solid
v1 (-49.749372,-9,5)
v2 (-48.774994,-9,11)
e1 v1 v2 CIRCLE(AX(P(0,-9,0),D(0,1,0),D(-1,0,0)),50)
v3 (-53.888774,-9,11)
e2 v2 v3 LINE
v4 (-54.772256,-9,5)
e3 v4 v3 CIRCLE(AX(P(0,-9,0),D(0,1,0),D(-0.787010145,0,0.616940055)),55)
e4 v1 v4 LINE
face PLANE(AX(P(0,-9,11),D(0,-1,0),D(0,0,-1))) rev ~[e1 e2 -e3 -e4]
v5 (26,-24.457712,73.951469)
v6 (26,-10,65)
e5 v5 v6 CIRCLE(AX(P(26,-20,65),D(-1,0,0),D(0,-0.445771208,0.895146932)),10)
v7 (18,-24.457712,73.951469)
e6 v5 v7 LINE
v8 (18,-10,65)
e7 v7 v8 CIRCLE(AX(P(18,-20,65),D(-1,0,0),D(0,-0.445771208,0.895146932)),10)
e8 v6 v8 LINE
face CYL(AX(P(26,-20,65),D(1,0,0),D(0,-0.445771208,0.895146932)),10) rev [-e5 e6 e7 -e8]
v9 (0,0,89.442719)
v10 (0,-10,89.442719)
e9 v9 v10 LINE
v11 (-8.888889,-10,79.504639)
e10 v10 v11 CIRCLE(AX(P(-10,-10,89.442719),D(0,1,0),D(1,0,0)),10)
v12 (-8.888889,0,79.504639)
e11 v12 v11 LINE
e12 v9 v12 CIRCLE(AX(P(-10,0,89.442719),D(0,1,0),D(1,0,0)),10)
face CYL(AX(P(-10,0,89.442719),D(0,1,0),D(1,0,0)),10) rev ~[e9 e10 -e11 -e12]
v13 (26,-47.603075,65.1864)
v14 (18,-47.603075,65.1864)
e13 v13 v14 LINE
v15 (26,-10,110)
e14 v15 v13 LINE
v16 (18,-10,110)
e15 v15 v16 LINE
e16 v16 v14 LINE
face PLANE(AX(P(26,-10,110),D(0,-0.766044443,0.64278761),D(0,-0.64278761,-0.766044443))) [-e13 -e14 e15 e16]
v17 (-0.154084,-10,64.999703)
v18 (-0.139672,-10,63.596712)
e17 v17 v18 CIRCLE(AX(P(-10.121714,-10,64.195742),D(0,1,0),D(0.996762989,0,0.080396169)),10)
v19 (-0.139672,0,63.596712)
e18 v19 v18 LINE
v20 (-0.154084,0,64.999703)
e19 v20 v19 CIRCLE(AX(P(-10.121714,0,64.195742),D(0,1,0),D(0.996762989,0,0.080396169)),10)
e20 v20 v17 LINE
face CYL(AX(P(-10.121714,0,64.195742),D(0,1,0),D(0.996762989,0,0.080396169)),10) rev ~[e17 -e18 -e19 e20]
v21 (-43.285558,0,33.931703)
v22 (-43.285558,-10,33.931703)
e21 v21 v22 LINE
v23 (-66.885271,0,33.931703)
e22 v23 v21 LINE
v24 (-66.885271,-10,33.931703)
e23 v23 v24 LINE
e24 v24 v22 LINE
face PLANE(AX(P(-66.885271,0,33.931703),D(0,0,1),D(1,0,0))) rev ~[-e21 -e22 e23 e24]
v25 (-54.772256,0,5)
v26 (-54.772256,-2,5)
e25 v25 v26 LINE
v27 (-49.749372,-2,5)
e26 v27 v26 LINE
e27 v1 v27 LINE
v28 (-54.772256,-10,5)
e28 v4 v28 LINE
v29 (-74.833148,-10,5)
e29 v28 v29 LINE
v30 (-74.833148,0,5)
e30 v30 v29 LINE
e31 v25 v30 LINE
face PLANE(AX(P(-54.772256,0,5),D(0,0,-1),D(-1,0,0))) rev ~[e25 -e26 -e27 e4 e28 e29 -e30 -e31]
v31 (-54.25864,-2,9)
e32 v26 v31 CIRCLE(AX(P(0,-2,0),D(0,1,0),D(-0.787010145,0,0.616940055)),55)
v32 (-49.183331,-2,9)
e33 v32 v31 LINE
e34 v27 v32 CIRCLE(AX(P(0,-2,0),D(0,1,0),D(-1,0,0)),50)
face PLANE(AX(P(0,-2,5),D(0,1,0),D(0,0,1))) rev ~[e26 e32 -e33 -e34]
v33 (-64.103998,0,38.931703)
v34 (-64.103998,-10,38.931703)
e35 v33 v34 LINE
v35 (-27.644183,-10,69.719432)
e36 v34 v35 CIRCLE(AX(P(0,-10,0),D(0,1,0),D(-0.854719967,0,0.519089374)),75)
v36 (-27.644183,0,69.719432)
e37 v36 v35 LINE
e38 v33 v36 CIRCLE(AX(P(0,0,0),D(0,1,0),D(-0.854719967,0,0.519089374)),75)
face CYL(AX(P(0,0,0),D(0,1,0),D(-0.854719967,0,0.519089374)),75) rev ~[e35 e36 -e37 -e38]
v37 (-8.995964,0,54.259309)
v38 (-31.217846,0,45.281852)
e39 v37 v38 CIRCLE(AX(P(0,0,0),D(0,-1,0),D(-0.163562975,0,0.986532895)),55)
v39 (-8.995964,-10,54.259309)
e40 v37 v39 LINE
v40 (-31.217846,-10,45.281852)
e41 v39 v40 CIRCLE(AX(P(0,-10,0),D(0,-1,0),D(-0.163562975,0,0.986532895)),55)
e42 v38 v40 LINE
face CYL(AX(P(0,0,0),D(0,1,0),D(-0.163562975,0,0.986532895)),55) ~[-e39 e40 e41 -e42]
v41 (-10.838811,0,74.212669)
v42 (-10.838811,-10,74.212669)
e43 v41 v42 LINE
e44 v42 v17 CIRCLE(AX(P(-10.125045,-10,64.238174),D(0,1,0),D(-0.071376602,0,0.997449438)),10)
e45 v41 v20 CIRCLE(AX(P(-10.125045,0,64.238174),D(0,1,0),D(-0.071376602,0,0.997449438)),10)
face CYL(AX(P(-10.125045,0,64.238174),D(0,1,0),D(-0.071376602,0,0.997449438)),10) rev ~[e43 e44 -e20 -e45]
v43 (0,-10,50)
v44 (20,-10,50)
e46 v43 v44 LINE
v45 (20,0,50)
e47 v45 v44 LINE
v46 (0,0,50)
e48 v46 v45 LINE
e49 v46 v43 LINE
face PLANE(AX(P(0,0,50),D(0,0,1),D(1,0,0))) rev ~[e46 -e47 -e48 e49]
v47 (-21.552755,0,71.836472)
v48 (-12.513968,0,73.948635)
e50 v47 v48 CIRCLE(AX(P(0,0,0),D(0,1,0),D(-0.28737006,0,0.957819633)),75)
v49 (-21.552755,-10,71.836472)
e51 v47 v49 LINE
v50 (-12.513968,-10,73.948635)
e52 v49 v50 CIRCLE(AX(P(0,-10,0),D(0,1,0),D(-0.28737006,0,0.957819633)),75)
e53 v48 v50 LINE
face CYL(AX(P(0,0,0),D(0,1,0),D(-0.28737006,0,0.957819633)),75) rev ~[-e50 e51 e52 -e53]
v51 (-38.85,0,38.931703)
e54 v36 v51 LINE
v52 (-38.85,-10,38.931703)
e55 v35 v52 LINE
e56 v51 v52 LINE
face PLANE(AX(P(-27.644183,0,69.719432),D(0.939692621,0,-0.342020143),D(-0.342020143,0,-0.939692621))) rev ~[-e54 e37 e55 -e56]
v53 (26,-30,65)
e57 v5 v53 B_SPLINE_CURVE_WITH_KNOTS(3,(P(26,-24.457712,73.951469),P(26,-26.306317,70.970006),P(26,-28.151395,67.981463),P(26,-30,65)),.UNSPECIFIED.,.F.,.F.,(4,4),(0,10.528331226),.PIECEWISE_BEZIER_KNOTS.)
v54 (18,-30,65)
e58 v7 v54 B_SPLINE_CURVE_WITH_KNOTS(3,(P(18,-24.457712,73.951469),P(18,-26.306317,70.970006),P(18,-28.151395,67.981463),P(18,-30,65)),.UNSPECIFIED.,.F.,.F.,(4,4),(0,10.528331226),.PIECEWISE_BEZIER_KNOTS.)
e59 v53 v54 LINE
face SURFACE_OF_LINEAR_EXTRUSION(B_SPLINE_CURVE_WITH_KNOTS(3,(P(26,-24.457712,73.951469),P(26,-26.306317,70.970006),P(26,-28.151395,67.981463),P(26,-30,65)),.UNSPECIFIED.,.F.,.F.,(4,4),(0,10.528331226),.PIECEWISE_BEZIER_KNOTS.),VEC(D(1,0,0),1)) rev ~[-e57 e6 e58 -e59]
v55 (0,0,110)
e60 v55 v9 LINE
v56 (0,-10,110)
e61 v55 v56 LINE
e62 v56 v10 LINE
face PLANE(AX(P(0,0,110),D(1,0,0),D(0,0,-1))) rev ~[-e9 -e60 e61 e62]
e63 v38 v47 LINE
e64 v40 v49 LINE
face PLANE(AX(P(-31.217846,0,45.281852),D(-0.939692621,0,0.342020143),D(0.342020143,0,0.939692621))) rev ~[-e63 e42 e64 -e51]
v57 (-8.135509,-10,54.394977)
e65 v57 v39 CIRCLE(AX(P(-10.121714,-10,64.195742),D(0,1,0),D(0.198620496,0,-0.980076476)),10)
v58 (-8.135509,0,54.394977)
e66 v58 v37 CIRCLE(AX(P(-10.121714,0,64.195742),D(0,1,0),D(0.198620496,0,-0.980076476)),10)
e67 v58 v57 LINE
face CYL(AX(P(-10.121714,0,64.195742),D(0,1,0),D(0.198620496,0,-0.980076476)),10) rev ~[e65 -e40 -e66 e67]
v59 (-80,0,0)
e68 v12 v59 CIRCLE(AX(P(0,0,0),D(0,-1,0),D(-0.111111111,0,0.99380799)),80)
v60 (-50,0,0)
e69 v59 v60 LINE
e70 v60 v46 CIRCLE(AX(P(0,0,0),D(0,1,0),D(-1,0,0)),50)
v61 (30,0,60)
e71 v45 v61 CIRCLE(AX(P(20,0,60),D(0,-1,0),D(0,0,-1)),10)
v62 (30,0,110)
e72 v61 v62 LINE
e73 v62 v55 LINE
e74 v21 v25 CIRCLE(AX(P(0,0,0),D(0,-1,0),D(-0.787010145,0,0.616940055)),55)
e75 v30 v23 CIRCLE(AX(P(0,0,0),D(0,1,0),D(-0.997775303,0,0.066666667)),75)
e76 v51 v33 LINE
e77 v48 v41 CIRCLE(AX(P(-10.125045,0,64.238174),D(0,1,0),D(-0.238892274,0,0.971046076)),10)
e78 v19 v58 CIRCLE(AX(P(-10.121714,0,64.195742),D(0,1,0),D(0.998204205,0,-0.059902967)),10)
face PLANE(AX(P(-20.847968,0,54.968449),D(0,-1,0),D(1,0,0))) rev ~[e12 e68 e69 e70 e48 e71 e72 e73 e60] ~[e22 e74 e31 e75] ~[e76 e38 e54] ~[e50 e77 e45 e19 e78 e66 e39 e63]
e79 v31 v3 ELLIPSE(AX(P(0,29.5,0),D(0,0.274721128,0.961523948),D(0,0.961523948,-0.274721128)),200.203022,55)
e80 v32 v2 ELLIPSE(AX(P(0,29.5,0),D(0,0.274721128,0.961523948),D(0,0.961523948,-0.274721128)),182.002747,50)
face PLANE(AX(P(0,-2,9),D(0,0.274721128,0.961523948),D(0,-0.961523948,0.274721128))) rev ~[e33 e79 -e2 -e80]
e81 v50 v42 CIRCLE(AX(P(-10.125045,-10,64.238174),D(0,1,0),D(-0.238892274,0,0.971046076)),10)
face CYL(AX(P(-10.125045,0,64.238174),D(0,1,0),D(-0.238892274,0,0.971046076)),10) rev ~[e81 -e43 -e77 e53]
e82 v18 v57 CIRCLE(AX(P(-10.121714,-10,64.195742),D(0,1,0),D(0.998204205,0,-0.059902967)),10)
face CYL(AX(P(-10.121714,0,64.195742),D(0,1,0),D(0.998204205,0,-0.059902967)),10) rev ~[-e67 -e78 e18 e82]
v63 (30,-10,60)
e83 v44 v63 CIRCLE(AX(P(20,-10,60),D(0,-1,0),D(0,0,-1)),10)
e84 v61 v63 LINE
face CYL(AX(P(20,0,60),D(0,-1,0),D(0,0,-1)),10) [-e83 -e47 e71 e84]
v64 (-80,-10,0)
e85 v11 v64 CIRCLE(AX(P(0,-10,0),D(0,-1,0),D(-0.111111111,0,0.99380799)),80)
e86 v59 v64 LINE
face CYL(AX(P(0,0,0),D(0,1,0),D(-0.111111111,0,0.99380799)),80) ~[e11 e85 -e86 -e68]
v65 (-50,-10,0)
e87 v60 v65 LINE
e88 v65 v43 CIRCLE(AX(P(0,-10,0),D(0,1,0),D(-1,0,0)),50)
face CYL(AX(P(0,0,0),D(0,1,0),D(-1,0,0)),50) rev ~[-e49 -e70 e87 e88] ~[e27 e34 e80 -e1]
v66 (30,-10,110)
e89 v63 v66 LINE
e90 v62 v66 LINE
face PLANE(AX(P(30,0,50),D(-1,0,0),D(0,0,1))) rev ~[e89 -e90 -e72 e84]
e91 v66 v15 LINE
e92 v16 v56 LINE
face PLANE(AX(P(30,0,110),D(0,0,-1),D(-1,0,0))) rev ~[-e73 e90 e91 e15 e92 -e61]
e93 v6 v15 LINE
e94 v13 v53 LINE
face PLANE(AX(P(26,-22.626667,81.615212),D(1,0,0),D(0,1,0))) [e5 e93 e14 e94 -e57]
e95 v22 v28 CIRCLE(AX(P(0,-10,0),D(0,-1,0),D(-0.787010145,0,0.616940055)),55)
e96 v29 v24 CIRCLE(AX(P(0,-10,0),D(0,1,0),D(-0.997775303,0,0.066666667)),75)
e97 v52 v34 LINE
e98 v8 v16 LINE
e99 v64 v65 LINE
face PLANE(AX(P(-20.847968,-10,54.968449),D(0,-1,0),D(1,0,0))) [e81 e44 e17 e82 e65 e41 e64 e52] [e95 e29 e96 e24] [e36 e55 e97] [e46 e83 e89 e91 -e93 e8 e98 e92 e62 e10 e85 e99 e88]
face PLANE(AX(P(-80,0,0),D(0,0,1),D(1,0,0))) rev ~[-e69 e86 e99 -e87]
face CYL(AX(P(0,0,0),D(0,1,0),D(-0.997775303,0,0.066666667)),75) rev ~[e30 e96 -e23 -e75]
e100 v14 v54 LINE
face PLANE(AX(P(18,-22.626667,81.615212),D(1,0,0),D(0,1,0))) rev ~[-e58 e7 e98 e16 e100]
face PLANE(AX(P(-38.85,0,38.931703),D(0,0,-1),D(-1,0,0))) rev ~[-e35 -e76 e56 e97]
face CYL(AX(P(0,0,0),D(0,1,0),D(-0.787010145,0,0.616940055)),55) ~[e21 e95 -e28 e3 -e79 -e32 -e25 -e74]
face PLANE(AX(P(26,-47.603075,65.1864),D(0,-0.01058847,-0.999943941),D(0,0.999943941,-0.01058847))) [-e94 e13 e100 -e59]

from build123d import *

# Parameters (mm, degrees)
F1_DEPTH = 10
F2_R     = 10
F4_DEPTH = 55
F6_START = -4
F6_DEPTH = 8


# Not quite as in the source:
# - a feature names something its author has since deleted; it is built from what else it names


with BuildPart() as f1:
    # F0 (on Front) → F1 (new body)
    with BuildSketch(Plane.XZ):
        with BuildLine():
            ThreePointArc((-50, 0), (-35.3553390593, 35.3553390593), (0, 50))
            Line((0, 50), (30, 50))
            Line((30, 50), (30, 110))
            Line((30, 110), (0, 110))
            Line((0, 110), (0, 89.4427191))
            ThreePointArc((0, 89.4427191), (-2.546440075, 82.7760524333), (-8.8888888889, 79.5046392))
            ThreePointArc((-8.8888888889, 79.5046392), (-59.6284794, 53.3333333333), (-80, 0))
            Line((-80, 0), (-50, 0))
        make_face()
        with BuildLine():
            Line((-0.1396715456, 63.5967118692), (-0.0513620047, 54.9999760177))
            ThreePointArc((-0.0513620047, 54.9999760177), (-4.1045972669, 54.8466250673), (-8.135508632, 54.3949767837))
            ThreePointArc((-8.135508632, 54.3949767837), (-8.5642581923, 54.317769449), (-8.9959636029, 54.2593092368))
            ThreePointArc((-8.9959636029, 54.2593092368), (-20.6018520556, 50.99572229), (-31.2178460585, 45.2818516347))
            ThreePointArc((-31.2178460585, 45.2818516347), (-35.1775050235, 42.2793464983), (-38.85, 38.9317030195))
            ThreePointArc((-38.85, 38.9317030195), (-41.1438023454, 36.4991442169), (-43.2855579864, 33.9317030195))
            ThreePointArc((-43.2855579864, 33.9317030195), (-51.1184366801, 20.2954534658), (-54.7722557505, 5))
            Line((-54.7722557505, 5), (-74.8331477355, 5))
            ThreePointArc((-74.8331477355, 5), (-72.3207331298, 19.8673490824), (-66.8852713996, 33.9317030195))
            ThreePointArc((-66.8852713996, 33.9317030195), (-65.5423309322, 36.4582344057), (-64.1039975353, 38.9317030195))
            ThreePointArc((-64.1039975353, 38.9317030195), (-48.3880483763, 57.3026768513), (-27.6441832414, 69.7194315304))
            ThreePointArc((-27.6441832414, 69.7194315304), (-24.6212334453, 70.8434532164), (-21.5527545012, 71.8364724455))
            ThreePointArc((-21.5527545012, 71.8364724455), (-17.0660687419, 73.0325221918), (-12.5139679551, 73.9486349165))
            ThreePointArc((-12.5139679551, 73.9486349165), (-11.6819966677, 74.1162256952), (-10.8388112367, 74.2126685343))
            ThreePointArc((-10.8388112367, 74.2126685343), (-5.5617429138, 74.7934958119), (-0.2568067386, 74.999560334))
            Line((-0.2568067386, 74.999560334), (-0.1540837044, 64.9997032265))
            ThreePointArc((-0.1540837044, 64.9997032265), (-0.1222411681, 64.2984606247), (-0.1396715456, 63.5967118692))
        make_face(mode=Mode.SUBTRACT)
        with BuildLine():
            ThreePointArc((-38.85, 38.9317030195), (-35.1775050235, 42.2793464983), (-31.2178460585, 45.2818516347))
            Line((-31.2178460585, 45.2818516347), (-21.5527545012, 71.8364724455))
            ThreePointArc((-21.5527545012, 71.8364724455), (-24.6212334453, 70.8434532164), (-27.6441832414, 69.7194315304))
            Line((-27.6441832414, 69.7194315304), (-38.85, 38.9317030195))
        make_face()
        with BuildLine():
            ThreePointArc((-43.2855579864, 33.9317030195), (-41.1438023454, 36.4991442169), (-38.85, 38.9317030195))
            Line((-38.85, 38.9317030195), (-64.1039975353, 38.9317030195))
            ThreePointArc((-64.1039975353, 38.9317030195), (-65.5423309322, 36.4582344057), (-66.8852713996, 33.9317030195))
            Line((-66.8852713996, 33.9317030195), (-43.2855579864, 33.9317030195))
        make_face()
        with BuildLine():
            ThreePointArc((-10.8388112367, 74.2126685343), (-3.5948385174, 71.8115750097), (-0.1540837044, 64.9997032265))
            Line((-0.1540837044, 64.9997032265), (-0.2568067386, 74.999560334))
            ThreePointArc((-0.2568067386, 74.999560334), (-5.5617429138, 74.7934958119), (-10.8388112367, 74.2126685343))
        make_face()
        with BuildLine():
            ThreePointArc((-8.135508632, 54.3949767837), (-4.1045972669, 54.8466250673), (-0.0513620047, 54.9999760177))
            Line((-0.0513620047, 54.9999760177), (-0.1396715456, 63.5967118692))
            ThreePointArc((-0.1396715456, 63.5967118692), (-2.5733550789, 57.6366041193), (-8.135508632, 54.3949767837))
        make_face()
    extrude(amount=F1_DEPTH)

    # F2
    f2_edges = [f1.edges().sort_by_distance(p)[0] for p in [
        (30, -5, 50),
    ]]
    fillet(f2_edges, radius=F2_R)

    # F3 (on Right) → F4 (cut)
    with BuildSketch(Plane.YZ):
        Polygon((-9, 11), (-9, 5), (-2, 5), (-2, 9), align=None)
    extrude(amount=-F4_DEPTH, mode=Mode.SUBTRACT)

    # F5 (on face) → F6 (join)
    with BuildSketch(Plane.YZ.offset(30).offset(F6_START)):
        with BuildLine():
            Line((-10, 65), (-10, 110))
            Line((-10, 110), (-47.6030751667, 65.1864000775))
            Line((-47.6030751667, 65.1864000775), (-30, 65))
            ThreePointArc((-30, 65), (-28.5022679561, 70.2641656131), (-24.4577120796, 73.9514693216))
            ThreePointArc((-24.4577120796, 73.9514693216), (-14.7358343869, 73.5022679561), (-10, 65))
        make_face()
        with BuildLine():
            ThreePointArc((-24.4577120796, 73.9514693216), (-28.5022679561, 70.2641656131), (-30, 65))
            add(Edge.make_bspline(
                [(-24.4577120796, 73.9514693216), (-26.3063166684, 70.9700062817), (-28.1513954112, 67.9814630399), (-30, 65)],
                knots=[0, 0, 0, 0, 10.5283312262, 10.5283312262, 10.5283312262, 10.5283312262], degree=3))
        make_face()
    extrude(amount=-F6_DEPTH)


solid = f1.part
